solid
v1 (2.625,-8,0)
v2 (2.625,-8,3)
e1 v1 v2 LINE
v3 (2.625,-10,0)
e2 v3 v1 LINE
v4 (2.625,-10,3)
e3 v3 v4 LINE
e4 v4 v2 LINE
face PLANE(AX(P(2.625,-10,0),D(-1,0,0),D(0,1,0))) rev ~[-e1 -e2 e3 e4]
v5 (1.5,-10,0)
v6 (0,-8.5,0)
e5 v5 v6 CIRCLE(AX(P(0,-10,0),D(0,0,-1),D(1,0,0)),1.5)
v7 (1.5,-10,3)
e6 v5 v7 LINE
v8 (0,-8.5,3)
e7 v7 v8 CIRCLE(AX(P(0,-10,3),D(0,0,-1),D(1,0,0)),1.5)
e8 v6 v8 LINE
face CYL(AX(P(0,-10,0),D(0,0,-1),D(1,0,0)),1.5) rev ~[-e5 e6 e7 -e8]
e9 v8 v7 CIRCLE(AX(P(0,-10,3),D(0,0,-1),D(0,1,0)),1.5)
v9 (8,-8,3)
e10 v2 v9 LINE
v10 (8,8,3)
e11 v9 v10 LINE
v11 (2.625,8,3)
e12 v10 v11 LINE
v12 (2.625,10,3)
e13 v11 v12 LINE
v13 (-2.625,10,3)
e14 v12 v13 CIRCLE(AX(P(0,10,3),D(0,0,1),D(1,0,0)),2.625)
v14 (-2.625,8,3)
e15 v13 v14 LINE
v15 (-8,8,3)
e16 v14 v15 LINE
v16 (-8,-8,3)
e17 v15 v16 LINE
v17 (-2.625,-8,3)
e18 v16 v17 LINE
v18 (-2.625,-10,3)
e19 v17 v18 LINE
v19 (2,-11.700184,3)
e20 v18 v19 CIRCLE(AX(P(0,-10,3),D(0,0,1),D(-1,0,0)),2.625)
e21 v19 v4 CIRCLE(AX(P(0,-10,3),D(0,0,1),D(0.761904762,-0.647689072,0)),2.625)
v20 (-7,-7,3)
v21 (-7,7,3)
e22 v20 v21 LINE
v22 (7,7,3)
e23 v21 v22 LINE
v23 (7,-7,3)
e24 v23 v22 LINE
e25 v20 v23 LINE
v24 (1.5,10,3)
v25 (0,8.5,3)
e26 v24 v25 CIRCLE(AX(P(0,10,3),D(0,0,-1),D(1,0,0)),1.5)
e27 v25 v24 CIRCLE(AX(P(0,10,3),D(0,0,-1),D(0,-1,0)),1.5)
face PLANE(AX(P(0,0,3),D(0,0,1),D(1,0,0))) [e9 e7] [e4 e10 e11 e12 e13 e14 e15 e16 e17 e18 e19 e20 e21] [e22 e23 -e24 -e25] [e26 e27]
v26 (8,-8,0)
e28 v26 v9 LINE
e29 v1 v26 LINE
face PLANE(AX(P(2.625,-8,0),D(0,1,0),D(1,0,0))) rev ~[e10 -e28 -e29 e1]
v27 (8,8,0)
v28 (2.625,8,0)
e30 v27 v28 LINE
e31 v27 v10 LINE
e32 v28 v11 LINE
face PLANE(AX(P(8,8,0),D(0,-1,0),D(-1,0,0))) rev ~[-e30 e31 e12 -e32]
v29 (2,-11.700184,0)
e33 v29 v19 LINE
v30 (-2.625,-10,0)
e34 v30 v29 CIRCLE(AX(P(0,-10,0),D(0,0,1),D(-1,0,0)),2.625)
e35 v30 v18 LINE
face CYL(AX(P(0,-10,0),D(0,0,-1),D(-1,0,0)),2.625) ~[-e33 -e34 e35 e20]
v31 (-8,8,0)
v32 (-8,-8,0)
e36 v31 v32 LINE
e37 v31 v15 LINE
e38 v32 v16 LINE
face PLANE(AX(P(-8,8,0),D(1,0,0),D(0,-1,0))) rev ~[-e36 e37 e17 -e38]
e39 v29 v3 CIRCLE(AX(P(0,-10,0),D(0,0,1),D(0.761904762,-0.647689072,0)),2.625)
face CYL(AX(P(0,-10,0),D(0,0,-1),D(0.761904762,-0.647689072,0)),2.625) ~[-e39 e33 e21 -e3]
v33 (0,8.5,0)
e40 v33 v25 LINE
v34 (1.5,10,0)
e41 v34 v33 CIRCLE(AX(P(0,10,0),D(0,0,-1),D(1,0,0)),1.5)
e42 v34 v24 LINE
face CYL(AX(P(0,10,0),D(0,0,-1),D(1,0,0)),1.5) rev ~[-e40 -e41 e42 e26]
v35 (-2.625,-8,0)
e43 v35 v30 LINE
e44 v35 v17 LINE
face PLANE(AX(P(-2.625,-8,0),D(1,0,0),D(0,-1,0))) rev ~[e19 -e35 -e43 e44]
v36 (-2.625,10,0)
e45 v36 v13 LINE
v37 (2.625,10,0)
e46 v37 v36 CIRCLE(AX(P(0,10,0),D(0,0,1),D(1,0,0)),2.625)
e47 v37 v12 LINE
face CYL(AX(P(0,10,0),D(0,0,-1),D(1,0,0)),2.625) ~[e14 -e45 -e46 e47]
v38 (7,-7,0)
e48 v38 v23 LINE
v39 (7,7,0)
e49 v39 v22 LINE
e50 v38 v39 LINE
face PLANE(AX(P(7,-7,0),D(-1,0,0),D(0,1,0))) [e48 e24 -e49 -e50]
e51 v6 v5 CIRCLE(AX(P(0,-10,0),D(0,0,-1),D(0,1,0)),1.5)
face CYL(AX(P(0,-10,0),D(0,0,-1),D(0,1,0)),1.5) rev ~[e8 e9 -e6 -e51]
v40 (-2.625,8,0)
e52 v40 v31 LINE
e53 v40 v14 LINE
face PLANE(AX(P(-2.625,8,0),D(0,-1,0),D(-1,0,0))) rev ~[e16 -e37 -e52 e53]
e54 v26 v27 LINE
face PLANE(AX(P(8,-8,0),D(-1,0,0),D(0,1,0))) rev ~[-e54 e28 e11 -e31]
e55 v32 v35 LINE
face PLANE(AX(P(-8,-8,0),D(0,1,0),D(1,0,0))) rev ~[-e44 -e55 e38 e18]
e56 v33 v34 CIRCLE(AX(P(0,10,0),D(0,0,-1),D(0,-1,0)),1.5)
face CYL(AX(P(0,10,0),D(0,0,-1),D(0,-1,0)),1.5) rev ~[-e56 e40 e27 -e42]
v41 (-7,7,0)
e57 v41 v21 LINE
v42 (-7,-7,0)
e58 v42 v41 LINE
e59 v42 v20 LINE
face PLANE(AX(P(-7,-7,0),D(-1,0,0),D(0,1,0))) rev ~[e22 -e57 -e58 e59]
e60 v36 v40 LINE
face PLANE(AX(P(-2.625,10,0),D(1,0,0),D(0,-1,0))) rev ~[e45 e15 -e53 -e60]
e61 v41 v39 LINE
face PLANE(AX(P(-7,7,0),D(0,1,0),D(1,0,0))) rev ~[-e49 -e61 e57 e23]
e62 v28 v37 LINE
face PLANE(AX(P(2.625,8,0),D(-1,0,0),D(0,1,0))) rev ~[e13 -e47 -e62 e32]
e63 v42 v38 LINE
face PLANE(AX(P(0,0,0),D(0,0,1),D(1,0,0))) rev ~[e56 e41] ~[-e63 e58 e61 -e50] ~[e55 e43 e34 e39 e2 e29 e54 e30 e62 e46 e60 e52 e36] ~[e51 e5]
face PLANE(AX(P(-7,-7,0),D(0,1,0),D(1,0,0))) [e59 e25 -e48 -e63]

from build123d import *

# Parameters (mm, degrees)
F0_W     = 14
F0_H     = 14
F1_DEPTH = 3


# Not quite as in the source:
# - a feature names something its author has since deleted; it is built from what else it names


with BuildPart() as f1:
    # F0 (on Top) → F1 (new body)
    with BuildSketch(Plane.XY):
        with BuildLine():
            Line((2.625, -8), (8, -8))
            Line((8, -8), (8, 8))
            Line((8, 8), (2.625, 8))
            Line((2.625, 8), (2, 8))
            Line((2, 8), (1.7001838136, 8))
            ThreePointArc((1.7001838136, 8), (0, 7.375), (-1.7001838136, 8))
            Line((-1.7001838136, 8), (-2, 8))
            Line((-2, 8), (-2.625, 8))
            Line((-2.625, 8), (-8, 8))
            Line((-8, 8), (-8, -8))
            Line((-8, -8), (-2.625, -8))
            Line((-2.625, -8), (-2, -8))
            Line((-2, -8), (-1.7001838136, -8))
            ThreePointArc((-1.7001838136, -8), (0, -7.375), (1.7001838136, -8))
            Line((1.7001838136, -8), (2, -8))
            Line((2, -8), (2.625, -8))
        make_face()
        Rectangle(F0_W, F0_H, mode=Mode.SUBTRACT)
        with BuildLine():
            Line((2.625, -10), (2.625, -8))
            Line((2.625, -8), (2, -8))
            Line((2, -8), (2, -8.2998161864))
            ThreePointArc((2, -8.2998161864), (2.4638004181, -9.0942889534), (2.625, -10))
        make_face()
        with BuildLine():
            Line((2, -8.2998161864), (2, -8))
            Line((2, -8), (1.7001838136, -8))
            ThreePointArc((1.7001838136, -8), (1.8561553006, -8.1438446994), (2, -8.2998161864))
        make_face()
        with BuildLine():
            ThreePointArc((2, -11.7001838136), (2.4638004181, -10.9057110466), (2.625, -10))
            ThreePointArc((2.625, -10), (2.4638004181, -9.0942889534), (2, -8.2998161864))
            Line((2, -8.2998161864), (2, -11.7001838136))
        make_face()
        with BuildLine():
            Line((2, 8), (2.625, 8))
            Line((2.625, 8), (2.625, 10))
            ThreePointArc((2.625, 10), (2.382604406, 8.8982644398), (1.7001838136, 8))
            Line((1.7001838136, 8), (2, 8))
        make_face()
        with BuildLine():
            ThreePointArc((2, -8.2998161864), (1.8561553006, -8.1438446994), (1.7001838136, -8))
            Line((1.7001838136, -8), (0, -8))
            Line((0, -8), (-1.7001838136, -8))
            ThreePointArc((-1.7001838136, -8), (-2.382604406, -8.8982644398), (-2.625, -10))
            ThreePointArc((-2.625, -10), (-0.9057110466, -12.4638004181), (2, -11.7001838136))
            Line((2, -11.7001838136), (2, -8.2998161864))
        make_face()
        with BuildLine():
            ThreePointArc((1.5, -10), (-1.0606601718, -11.0606601718), (0, -8.5))
            ThreePointArc((0, -8.5), (1.0606601718, -8.9393398282), (1.5, -10))
        make_face(mode=Mode.SUBTRACT)
        with BuildLine():
            Line((0, -8), (1.7001838136, -8))
            ThreePointArc((1.7001838136, -8), (0, -7.375), (-1.7001838136, -8))
            Line((-1.7001838136, -8), (0, -8))
        make_face()
        with BuildLine():
            ThreePointArc((1.7001838136, 8), (2.382604406, 8.8982644398), (2.625, 10))
            ThreePointArc((2.625, 10), (0, 12.625), (-2.625, 10))
            ThreePointArc((-2.625, 10), (-2.382604406, 8.8982644398), (-1.7001838136, 8))
            Line((-1.7001838136, 8), (0, 8))
            Line((0, 8), (1.7001838136, 8))
        make_face()
        with BuildLine():
            ThreePointArc((1.5, 10), (1.0606601718, 8.9393398282), (0, 8.5))
            ThreePointArc((0, 8.5), (-1.0606601718, 11.0606601718), (1.5, 10))
        make_face(mode=Mode.SUBTRACT)
        with BuildLine():
            ThreePointArc((-2.625, -10), (-2.382604406, -8.8982644398), (-1.7001838136, -8))
            Line((-1.7001838136, -8), (-2, -8))
            Line((-2, -8), (-2.625, -8))
            Line((-2.625, -8), (-2.625, -10))
        make_face()
        with BuildLine():
            ThreePointArc((-1.7001838136, 8), (0, 7.375), (1.7001838136, 8))
            Line((1.7001838136, 8), (0, 8))
            Line((0, 8), (-1.7001838136, 8))
        make_face()
        with BuildLine():
            ThreePointArc((-1.7001838136, 8), (-2.382604406, 8.8982644398), (-2.625, 10))
            Line((-2.625, 10), (-2.625, 8))
            Line((-2.625, 8), (-2, 8))
            Line((-2, 8), (-1.7001838136, 8))
        make_face()
    extrude(amount=F1_DEPTH)


solid = f1.part
